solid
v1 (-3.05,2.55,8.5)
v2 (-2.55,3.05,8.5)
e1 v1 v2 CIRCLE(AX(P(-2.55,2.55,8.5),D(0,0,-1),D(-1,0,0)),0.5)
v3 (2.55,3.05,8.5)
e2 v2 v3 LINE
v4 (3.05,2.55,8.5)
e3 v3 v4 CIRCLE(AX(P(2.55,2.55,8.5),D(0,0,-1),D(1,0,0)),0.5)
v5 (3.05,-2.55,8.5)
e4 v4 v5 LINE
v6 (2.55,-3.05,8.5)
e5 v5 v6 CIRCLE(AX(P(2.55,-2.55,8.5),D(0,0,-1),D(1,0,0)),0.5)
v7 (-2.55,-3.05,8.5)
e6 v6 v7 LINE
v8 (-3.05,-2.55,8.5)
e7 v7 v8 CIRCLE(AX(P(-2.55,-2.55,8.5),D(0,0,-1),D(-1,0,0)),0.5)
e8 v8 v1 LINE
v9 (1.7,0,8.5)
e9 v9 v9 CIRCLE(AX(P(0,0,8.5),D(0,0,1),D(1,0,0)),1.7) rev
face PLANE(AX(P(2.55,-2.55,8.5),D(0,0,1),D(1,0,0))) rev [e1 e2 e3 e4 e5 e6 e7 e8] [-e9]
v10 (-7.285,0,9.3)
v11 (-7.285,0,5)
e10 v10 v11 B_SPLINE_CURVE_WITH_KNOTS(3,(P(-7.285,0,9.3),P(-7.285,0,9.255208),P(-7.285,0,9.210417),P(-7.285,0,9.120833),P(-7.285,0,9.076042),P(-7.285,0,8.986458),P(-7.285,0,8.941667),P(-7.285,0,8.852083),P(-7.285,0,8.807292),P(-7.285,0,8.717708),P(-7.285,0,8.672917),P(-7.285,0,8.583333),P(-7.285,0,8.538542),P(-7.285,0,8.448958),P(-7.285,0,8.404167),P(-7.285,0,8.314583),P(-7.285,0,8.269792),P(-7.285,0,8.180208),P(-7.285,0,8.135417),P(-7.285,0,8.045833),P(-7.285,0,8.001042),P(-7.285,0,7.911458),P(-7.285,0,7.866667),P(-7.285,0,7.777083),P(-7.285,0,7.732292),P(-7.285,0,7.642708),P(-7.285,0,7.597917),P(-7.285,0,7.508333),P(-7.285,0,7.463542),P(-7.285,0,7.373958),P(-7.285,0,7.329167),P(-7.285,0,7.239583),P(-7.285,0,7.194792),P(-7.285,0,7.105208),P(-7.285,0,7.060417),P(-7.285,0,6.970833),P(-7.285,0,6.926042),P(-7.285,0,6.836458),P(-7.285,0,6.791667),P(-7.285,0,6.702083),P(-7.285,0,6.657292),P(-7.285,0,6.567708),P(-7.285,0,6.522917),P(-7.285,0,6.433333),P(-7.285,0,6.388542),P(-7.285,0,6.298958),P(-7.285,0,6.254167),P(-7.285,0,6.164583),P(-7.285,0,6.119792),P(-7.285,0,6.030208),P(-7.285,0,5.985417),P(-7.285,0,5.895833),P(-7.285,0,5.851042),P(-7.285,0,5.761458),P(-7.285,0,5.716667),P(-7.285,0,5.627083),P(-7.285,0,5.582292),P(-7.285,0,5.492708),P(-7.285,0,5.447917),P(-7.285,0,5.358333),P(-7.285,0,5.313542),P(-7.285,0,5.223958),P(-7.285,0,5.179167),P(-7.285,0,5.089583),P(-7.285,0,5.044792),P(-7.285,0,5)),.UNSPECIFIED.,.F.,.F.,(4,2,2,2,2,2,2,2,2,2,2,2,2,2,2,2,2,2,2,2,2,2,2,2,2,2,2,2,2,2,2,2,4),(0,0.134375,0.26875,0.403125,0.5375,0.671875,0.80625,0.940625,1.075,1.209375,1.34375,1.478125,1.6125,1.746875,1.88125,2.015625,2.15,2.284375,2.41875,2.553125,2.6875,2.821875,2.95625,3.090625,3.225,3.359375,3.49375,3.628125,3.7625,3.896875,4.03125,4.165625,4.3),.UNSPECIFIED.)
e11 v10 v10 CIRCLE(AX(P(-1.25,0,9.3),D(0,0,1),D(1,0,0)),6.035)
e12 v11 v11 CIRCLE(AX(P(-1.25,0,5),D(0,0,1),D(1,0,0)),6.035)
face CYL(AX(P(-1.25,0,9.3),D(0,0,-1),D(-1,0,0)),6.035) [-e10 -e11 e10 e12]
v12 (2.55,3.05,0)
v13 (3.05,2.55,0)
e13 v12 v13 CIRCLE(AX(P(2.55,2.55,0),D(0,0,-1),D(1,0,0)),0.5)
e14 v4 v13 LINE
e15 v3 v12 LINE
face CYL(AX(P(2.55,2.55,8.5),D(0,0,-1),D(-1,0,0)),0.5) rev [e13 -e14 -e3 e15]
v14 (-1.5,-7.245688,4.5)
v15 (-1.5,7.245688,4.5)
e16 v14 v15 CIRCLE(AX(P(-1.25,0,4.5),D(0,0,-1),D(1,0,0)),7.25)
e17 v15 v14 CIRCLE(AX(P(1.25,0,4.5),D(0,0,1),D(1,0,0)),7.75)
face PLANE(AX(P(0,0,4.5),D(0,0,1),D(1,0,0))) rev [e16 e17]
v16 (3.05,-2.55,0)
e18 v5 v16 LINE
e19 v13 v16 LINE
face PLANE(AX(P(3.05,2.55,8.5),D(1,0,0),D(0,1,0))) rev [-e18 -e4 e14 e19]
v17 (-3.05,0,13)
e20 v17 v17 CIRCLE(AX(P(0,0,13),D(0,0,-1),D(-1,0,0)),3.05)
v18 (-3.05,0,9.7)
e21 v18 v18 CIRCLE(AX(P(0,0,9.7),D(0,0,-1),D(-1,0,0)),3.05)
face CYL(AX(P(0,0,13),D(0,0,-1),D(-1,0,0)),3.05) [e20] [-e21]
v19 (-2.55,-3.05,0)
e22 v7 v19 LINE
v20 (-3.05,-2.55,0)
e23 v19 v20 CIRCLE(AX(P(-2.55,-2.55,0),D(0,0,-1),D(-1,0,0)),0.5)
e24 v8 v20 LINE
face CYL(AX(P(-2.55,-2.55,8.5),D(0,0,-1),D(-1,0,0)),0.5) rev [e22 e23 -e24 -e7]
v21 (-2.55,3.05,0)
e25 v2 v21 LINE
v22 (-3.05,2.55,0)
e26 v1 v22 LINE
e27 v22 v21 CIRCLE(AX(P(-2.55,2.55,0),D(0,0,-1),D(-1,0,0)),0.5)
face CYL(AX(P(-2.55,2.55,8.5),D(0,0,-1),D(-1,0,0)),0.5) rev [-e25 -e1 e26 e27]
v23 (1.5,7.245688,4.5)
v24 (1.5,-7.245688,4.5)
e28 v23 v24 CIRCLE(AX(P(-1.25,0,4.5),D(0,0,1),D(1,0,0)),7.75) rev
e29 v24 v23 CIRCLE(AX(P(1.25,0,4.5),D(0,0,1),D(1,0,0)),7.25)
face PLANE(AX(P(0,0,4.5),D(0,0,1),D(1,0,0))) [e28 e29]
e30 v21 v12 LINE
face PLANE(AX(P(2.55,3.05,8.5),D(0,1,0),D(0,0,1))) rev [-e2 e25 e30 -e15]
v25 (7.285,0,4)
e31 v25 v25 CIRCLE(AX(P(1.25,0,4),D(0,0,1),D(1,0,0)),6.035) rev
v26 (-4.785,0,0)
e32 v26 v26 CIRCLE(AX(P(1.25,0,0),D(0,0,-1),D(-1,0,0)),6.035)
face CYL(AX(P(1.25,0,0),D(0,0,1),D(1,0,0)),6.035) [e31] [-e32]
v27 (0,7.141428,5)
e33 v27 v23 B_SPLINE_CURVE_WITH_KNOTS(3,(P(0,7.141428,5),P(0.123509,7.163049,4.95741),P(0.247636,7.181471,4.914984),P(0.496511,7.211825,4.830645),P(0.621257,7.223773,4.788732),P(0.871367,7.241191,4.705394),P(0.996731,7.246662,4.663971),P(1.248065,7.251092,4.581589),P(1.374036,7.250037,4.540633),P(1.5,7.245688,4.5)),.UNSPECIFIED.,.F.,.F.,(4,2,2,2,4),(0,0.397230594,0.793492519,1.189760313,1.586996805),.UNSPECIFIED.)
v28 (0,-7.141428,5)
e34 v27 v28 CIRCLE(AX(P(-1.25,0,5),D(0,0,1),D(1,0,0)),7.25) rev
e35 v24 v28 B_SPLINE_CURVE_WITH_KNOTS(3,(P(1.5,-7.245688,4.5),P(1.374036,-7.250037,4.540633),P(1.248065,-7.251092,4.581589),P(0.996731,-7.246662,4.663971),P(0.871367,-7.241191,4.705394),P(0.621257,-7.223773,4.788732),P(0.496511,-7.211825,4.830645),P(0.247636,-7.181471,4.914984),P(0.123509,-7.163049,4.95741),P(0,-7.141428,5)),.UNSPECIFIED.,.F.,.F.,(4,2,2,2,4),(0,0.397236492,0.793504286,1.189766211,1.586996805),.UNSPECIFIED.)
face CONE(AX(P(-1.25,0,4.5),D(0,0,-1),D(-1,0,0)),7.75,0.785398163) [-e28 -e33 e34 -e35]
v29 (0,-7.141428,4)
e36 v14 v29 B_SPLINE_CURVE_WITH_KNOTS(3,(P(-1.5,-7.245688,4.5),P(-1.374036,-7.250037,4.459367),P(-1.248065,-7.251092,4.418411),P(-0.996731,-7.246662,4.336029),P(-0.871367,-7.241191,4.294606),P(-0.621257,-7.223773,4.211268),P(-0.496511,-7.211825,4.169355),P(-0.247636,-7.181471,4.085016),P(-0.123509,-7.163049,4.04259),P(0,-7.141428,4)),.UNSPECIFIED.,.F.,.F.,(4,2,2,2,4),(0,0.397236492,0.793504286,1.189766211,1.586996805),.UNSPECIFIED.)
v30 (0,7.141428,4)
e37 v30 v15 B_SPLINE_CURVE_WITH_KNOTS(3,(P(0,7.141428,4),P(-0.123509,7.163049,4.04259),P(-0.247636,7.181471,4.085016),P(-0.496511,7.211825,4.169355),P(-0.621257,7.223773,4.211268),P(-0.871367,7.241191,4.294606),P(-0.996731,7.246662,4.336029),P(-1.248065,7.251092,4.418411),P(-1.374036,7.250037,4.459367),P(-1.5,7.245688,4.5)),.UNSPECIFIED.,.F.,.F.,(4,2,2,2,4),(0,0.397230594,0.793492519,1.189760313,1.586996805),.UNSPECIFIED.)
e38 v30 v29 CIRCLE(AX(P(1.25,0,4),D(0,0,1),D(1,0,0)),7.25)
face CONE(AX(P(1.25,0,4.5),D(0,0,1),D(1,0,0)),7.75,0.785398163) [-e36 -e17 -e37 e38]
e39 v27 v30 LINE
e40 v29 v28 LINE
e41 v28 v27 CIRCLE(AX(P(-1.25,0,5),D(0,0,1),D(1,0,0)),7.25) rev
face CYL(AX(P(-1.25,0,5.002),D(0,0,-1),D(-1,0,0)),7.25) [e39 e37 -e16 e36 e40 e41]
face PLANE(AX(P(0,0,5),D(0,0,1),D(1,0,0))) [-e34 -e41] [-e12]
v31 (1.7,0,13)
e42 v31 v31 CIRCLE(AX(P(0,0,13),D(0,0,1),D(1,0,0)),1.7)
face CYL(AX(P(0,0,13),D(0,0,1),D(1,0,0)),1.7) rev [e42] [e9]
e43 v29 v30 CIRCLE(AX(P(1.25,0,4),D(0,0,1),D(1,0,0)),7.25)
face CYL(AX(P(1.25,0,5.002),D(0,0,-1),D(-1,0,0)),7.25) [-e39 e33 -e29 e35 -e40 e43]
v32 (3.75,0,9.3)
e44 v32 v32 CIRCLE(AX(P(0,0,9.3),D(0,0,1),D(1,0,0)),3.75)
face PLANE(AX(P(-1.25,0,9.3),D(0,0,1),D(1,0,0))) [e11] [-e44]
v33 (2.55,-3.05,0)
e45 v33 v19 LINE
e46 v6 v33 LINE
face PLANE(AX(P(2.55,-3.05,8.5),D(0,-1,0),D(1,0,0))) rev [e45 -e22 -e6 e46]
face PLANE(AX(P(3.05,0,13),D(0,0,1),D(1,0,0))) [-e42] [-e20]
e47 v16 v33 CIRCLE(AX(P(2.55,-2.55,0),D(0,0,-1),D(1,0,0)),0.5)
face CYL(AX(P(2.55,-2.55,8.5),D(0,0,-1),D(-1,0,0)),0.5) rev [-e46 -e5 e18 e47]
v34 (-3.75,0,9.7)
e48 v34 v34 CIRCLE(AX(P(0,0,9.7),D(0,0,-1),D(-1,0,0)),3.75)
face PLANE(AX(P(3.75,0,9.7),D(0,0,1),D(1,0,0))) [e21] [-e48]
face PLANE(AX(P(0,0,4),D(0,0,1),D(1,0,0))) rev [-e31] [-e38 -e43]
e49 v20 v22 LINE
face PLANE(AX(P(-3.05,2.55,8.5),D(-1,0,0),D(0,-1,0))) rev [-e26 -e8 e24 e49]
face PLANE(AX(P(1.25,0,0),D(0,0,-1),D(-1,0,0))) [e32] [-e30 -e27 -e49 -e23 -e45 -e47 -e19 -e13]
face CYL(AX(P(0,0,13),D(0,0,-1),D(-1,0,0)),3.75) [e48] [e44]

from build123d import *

# Parameters (mm, degrees)
EXTRUDE_START           = -0.5
EXTRUDE_1_OUTLINE_R     = 6.035
EXTRUDE_1_DEPTH         = 4.8
EXTRUDE_START_2         = 4
EXTRUDE_1_2_DEPTH       = 1
SKETCH_2_R              = 6.035
EXTRUDE_2_DEPTH         = 4
HOLE_WIZARD_3_4_3_4_1_D = 3.4
CUT_EXTRUDE_1_DEPTH     = 8.5


with BuildPart() as part:
    # 凸台-拉伸1: read off the stored shape, not the designer's step
    # 凸台-拉伸1 outline → 凸台-拉伸1 (new body)
    with BuildSketch(Plane.XY.offset(5).offset(EXTRUDE_START)):
        with Locations((-1.25, 0)):
            Circle(EXTRUDE_1_OUTLINE_R)
    extrude(amount=EXTRUDE_1_DEPTH)

    # Extrude 1 2 outline → Extrude 1 2 (add)
    with BuildSketch(Plane.XY.offset(EXTRUDE_START_2)):
        with BuildLine():
            ThreePointArc((0, -7.141428429), (8.5, 0), (0, 7.141428429))
            ThreePointArc((0, 7.141428429), (-8.5, 0), (0, -7.141428429))
        make_face()
    extrude(amount=EXTRUDE_1_2_DEPTH)

    # Extrude 1 3 outline → Extrude 1 3 (revolve, cut)
    with BuildSketch(Plane(origin=(-1.25, 0, 0), x_dir=(1, 0, 0), z_dir=(0, -1, 0))):
        Polygon((7.25, 5), (7.75, 4.5), (9.75, 4.5), (9.75, 5), align=None)
    revolve(axis=Axis((-1.25, 0, 0), (0, 0, 1)), mode=Mode.SUBTRACT)

    # Extrude 1 4 outline → Extrude 1 4 (revolve, cut)
    with BuildSketch(Plane(origin=(1.25, 0, 0), x_dir=(1, 0, 0), z_dir=(0, -1, 0))):
        Polygon((9.75, 4.5), (7.75, 4.5), (7.25, 4), (9.75, 4), align=None)
    revolve(axis=Axis((1.25, 0, 0), (0, 0, 1)), mode=Mode.SUBTRACT)

    # 草图2 → 凸台-拉伸2 (add)
    with BuildSketch(Plane(origin=(0, 0, 4), x_dir=(-1, 0, 0), z_dir=(0, 0, -1))):
        with Locations(Location((-1.25, 0, 0), (0, 0, 180))):
            Circle(SKETCH_2_R)
    extrude(amount=EXTRUDE_2_DEPTH)

    # 草图5 → 旋转1 (revolve)
    with BuildSketch(Plane.XZ, mode=Mode.PRIVATE) as revolve_1_sk:
        Polygon((3.05, 13), (0, 13), (0, 9), (3.75, 9), (3.75, 9.7), (3.05, 9.7), align=None)
    revolve(revolve_1_sk.sketch.rotate(Axis((0, 0, 13), (0, 0, -1)), 180), axis=Axis((0, 0, 13), (0, 0, -1)))

    # Ø3.4 (3.4) 直径孔1 (through all)
    with Locations(Plane.XY.offset(13)):
        with Locations((0, 0)):
            Hole(HOLE_WIZARD_3_4_3_4_1_D / 2)

    # 草图8 → 切除-拉伸1 (cut)
    with BuildSketch(Plane(origin=(0, 0, 0), x_dir=(-1, 0, 0), z_dir=(0, 0, -1))):
        with BuildLine():
            Line((-2.55, 3.05), (2.55, 3.05))
            ThreePointArc((2.55, 3.05), (2.903553391, 2.903553391), (3.05, 2.55))
            Line((3.05, 2.55), (3.05, -2.55))
            ThreePointArc((3.05, -2.55), (2.903553391, -2.903553391), (2.55, -3.05))
            Line((2.55, -3.05), (-2.55, -3.05))
            ThreePointArc((-2.55, -3.05), (-2.903553391, -2.903553391), (-3.05, -2.55))
            Line((-3.05, -2.55), (-3.05, 2.55))
            ThreePointArc((-3.05, 2.55), (-2.903553391, 2.903553391), (-2.55, 3.05))
        make_face()
    extrude(amount=-CUT_EXTRUDE_1_DEPTH, mode=Mode.SUBTRACT)


solid = part.part
